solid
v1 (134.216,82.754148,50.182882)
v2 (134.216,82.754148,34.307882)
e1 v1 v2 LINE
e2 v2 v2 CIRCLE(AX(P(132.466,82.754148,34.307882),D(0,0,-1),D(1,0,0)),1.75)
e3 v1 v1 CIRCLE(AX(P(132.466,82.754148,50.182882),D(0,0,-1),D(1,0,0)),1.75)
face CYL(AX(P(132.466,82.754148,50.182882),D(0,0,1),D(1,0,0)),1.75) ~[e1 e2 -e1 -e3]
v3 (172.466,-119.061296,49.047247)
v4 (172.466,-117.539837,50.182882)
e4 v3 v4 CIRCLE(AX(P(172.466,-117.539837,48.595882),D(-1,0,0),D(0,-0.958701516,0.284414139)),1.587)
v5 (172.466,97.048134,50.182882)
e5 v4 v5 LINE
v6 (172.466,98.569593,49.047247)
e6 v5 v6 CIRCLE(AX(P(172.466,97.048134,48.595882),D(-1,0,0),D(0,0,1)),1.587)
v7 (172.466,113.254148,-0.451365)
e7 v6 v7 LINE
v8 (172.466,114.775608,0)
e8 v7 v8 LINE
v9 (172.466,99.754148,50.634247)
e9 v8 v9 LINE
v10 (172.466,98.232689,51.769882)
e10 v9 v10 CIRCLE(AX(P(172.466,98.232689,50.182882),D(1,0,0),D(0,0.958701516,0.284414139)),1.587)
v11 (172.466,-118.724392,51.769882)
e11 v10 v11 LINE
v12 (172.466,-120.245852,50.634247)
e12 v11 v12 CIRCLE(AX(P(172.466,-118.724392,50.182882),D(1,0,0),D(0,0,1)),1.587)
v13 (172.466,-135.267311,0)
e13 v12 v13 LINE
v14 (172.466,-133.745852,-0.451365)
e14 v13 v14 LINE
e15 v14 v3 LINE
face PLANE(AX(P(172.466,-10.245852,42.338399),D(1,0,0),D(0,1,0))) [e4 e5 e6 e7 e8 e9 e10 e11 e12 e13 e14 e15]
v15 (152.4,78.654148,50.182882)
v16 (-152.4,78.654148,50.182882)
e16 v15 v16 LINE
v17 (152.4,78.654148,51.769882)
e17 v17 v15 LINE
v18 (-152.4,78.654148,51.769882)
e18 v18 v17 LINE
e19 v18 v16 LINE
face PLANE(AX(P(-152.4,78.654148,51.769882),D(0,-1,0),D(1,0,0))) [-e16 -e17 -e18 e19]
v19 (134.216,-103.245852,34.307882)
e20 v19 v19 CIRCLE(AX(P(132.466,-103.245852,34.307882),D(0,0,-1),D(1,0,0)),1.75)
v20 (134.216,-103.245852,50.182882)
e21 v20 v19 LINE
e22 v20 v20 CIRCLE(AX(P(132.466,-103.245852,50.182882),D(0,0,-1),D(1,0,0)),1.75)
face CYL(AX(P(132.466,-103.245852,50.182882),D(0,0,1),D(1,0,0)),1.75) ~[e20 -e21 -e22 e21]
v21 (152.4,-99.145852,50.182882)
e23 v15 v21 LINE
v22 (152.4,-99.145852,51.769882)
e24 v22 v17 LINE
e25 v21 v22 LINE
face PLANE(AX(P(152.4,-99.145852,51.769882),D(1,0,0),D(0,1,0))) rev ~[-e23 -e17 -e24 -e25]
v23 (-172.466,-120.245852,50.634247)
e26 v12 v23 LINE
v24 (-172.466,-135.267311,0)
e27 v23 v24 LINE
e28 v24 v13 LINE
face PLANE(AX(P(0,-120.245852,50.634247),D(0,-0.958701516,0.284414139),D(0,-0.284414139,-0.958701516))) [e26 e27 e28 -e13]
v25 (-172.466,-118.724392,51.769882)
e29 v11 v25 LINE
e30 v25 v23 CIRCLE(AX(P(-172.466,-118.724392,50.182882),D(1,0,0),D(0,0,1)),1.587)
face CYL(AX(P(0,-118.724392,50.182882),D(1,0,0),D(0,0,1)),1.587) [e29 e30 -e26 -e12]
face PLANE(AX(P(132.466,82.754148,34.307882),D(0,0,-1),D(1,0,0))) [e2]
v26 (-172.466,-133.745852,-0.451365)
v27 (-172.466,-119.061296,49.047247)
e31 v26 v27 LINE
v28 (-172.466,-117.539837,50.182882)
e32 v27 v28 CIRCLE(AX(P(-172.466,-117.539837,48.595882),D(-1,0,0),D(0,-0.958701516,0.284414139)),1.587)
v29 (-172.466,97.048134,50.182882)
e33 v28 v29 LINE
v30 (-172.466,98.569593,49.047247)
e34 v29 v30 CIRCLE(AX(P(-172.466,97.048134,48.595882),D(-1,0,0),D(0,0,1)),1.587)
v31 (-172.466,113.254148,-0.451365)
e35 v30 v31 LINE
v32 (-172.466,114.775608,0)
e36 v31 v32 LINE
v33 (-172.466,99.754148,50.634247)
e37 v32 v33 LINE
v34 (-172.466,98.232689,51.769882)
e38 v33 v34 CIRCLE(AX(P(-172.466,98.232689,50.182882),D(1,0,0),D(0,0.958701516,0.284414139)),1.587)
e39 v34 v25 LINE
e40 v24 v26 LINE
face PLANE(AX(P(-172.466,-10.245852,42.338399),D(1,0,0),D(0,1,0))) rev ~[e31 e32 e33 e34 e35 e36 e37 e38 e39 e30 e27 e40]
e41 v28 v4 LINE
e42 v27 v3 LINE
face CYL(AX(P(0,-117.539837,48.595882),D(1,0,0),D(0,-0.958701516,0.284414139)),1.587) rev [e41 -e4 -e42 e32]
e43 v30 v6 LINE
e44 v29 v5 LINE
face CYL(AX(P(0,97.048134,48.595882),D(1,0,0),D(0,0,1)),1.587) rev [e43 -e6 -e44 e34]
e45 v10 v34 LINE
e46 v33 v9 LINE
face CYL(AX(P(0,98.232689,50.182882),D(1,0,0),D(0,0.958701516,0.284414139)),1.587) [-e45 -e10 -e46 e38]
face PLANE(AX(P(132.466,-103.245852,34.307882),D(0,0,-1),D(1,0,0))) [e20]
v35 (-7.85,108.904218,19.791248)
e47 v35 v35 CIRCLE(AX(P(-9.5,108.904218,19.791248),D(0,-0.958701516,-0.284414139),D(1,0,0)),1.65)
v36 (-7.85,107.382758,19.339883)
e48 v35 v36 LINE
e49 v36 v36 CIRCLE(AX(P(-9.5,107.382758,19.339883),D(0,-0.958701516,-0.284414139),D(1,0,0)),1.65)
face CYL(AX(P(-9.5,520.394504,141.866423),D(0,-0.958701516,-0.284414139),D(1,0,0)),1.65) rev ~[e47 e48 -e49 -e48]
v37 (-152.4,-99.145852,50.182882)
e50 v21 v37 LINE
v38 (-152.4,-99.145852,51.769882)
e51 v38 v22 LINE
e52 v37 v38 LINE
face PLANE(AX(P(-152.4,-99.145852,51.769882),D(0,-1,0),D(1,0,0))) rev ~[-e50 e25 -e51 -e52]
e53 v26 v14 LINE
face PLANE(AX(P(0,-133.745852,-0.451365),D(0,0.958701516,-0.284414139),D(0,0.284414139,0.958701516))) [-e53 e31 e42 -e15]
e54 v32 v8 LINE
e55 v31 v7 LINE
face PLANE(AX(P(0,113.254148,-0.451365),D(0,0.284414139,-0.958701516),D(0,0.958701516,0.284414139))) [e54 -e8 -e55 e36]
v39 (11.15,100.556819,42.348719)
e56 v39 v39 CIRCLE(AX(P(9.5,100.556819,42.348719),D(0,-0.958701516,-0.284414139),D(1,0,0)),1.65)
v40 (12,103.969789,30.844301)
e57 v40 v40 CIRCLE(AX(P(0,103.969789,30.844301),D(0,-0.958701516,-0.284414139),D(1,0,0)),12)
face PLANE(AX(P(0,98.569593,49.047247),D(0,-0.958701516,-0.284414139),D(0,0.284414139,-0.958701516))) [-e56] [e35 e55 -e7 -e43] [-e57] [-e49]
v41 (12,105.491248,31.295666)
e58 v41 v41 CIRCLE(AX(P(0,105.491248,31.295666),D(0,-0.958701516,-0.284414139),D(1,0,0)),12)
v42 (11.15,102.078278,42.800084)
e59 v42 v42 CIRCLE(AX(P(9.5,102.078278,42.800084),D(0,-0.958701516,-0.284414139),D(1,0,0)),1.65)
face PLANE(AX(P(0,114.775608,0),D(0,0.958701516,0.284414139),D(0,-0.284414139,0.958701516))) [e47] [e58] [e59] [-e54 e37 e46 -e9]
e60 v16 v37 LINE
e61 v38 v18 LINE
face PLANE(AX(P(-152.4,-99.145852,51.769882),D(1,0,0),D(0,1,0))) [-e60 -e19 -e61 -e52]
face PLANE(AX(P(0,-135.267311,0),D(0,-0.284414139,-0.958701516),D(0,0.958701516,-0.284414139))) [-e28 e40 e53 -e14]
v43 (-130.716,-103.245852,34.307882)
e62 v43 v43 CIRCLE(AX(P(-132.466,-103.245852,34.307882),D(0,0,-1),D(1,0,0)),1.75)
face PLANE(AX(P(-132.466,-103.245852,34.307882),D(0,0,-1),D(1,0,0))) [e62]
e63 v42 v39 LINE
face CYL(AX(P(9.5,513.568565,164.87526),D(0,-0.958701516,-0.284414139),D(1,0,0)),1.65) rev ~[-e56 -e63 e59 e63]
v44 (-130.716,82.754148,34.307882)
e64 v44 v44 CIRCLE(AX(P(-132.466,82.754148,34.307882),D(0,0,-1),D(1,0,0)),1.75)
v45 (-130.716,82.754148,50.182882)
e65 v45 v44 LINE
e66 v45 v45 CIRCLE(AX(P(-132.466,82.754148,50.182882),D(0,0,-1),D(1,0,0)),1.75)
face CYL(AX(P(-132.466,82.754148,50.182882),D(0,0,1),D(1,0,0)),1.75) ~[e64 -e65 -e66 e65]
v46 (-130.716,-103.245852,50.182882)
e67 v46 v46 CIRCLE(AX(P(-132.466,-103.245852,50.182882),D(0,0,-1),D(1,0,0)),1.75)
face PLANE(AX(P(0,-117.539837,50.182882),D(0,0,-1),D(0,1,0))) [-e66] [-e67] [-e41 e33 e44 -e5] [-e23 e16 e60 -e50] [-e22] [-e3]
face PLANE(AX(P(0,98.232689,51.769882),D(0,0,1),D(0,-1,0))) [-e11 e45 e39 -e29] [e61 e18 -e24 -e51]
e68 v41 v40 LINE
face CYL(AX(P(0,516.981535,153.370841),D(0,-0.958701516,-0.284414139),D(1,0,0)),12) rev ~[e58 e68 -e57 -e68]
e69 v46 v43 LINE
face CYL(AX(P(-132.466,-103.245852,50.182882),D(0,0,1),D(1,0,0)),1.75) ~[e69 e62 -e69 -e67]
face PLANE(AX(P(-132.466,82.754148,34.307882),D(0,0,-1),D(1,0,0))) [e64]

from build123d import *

# Parameters (mm, degrees)
F1_DEPTH = 172.466
F2_W     = 304.8
F2_H     = 177.8
F3_DEPTH = 12.7
F5_R     = 1.75
F6_DEPTH = 15.875
F7_D     = 3.3
F8_D     = 3.3
F9_D     = 24


# Not quite as in the source:
# - a length typed as a fraction of an inch, garbled in the dataset ("3 / 203.2 mm" for 3/8 in), is restored


with BuildPart() as f1:
    # F0 (on Right) → F1 (new body, symmetric)
    with BuildSketch(Plane.YZ):
        with BuildLine():
            Line((-120.2458515259, 50.6342471194), (-135.2673108323, 0))
            Line((-135.2673108323, 0), (-133.7458515259, -0.4513652391))
            Line((-133.7458515259, -0.4513652391), (-119.0612964359, 49.0472471194))
            ThreePointArc((-119.0612964359, 49.0472471194), (-118.4891137925, 49.8676691335), (-117.5398371295, 50.1828818803))
            Line((-117.5398371295, 50.1828818803), (97.0481340778, 50.1828818803))
            ThreePointArc((97.0481340778, 50.1828818803), (97.9974107407, 49.8676691335), (98.5695933841, 49.0472471194))
            Line((98.5695933841, 49.0472471194), (113.2541484741, -0.4513652391))
            Line((113.2541484741, -0.4513652391), (114.7756077805, 0))
            Line((114.7756077805, 0), (99.7541484741, 50.6342471194))
            ThreePointArc((99.7541484741, 50.6342471194), (99.1819658307, 51.4546691335), (98.2326891677, 51.7698818803))
            Line((98.2326891677, 51.7698818803), (-118.7243922195, 51.7698818803))
            ThreePointArc((-118.7243922195, 51.7698818803), (-119.6736688824, 51.4546691335), (-120.2458515259, 50.6342471194))
        make_face()
    extrude(amount=F1_DEPTH, both=True)

    # F2 (on face) → F3 (cut, symmetric)
    with BuildSketch(Plane.XY.offset(51.7698818803)):
        with Locations((0, -10.2458515259)):
            Rectangle(F2_W, F2_H)
    extrude(amount=F3_DEPTH, both=True, mode=Mode.SUBTRACT)

    # F5 (on face) → F6 (join)
    with BuildSketch(Plane(origin=(0, 0, 50.1828818803), x_dir=(1, 0, 0), z_dir=(0, 0, -1))):
        with Locations((132.466, -82.7541484741)):
            Circle(F5_R)
        with Locations((132.466, 103.2458515259)):
            Circle(F5_R)
        with Locations((-132.466, 103.2458515259)):
            Circle(F5_R)
        with Locations((-132.466, -82.7541484741)):
            Circle(F5_R)
    extrude(amount=F6_DEPTH)

    # F7 (through all)
    with Locations(Plane(origin=(0, 105.4912478783, 31.2956660231), x_dir=(-1, 0, 0), z_dir=(0, 0.9587015163, 0.2844141393))):
        with Locations((-9.5, 12)):
            Hole(F7_D / 2)

    # F8 (through all)
    with Locations(Plane(origin=(0, 105.4912478783, 31.2956660231), x_dir=(-1, 0, 0), z_dir=(0, 0.9587015163, 0.2844141393))):
        with Locations((9.5, -12)):
            Hole(F8_D / 2)

    # F9 (through all)
    with Locations(Plane(origin=(0, 105.4912478783, 31.2956660231), x_dir=(-1, 0, 0), z_dir=(0, 0.9587015163, 0.2844141393))):
        with Locations((0, 0)):
            Hole(F9_D / 2)


solid = f1.part
